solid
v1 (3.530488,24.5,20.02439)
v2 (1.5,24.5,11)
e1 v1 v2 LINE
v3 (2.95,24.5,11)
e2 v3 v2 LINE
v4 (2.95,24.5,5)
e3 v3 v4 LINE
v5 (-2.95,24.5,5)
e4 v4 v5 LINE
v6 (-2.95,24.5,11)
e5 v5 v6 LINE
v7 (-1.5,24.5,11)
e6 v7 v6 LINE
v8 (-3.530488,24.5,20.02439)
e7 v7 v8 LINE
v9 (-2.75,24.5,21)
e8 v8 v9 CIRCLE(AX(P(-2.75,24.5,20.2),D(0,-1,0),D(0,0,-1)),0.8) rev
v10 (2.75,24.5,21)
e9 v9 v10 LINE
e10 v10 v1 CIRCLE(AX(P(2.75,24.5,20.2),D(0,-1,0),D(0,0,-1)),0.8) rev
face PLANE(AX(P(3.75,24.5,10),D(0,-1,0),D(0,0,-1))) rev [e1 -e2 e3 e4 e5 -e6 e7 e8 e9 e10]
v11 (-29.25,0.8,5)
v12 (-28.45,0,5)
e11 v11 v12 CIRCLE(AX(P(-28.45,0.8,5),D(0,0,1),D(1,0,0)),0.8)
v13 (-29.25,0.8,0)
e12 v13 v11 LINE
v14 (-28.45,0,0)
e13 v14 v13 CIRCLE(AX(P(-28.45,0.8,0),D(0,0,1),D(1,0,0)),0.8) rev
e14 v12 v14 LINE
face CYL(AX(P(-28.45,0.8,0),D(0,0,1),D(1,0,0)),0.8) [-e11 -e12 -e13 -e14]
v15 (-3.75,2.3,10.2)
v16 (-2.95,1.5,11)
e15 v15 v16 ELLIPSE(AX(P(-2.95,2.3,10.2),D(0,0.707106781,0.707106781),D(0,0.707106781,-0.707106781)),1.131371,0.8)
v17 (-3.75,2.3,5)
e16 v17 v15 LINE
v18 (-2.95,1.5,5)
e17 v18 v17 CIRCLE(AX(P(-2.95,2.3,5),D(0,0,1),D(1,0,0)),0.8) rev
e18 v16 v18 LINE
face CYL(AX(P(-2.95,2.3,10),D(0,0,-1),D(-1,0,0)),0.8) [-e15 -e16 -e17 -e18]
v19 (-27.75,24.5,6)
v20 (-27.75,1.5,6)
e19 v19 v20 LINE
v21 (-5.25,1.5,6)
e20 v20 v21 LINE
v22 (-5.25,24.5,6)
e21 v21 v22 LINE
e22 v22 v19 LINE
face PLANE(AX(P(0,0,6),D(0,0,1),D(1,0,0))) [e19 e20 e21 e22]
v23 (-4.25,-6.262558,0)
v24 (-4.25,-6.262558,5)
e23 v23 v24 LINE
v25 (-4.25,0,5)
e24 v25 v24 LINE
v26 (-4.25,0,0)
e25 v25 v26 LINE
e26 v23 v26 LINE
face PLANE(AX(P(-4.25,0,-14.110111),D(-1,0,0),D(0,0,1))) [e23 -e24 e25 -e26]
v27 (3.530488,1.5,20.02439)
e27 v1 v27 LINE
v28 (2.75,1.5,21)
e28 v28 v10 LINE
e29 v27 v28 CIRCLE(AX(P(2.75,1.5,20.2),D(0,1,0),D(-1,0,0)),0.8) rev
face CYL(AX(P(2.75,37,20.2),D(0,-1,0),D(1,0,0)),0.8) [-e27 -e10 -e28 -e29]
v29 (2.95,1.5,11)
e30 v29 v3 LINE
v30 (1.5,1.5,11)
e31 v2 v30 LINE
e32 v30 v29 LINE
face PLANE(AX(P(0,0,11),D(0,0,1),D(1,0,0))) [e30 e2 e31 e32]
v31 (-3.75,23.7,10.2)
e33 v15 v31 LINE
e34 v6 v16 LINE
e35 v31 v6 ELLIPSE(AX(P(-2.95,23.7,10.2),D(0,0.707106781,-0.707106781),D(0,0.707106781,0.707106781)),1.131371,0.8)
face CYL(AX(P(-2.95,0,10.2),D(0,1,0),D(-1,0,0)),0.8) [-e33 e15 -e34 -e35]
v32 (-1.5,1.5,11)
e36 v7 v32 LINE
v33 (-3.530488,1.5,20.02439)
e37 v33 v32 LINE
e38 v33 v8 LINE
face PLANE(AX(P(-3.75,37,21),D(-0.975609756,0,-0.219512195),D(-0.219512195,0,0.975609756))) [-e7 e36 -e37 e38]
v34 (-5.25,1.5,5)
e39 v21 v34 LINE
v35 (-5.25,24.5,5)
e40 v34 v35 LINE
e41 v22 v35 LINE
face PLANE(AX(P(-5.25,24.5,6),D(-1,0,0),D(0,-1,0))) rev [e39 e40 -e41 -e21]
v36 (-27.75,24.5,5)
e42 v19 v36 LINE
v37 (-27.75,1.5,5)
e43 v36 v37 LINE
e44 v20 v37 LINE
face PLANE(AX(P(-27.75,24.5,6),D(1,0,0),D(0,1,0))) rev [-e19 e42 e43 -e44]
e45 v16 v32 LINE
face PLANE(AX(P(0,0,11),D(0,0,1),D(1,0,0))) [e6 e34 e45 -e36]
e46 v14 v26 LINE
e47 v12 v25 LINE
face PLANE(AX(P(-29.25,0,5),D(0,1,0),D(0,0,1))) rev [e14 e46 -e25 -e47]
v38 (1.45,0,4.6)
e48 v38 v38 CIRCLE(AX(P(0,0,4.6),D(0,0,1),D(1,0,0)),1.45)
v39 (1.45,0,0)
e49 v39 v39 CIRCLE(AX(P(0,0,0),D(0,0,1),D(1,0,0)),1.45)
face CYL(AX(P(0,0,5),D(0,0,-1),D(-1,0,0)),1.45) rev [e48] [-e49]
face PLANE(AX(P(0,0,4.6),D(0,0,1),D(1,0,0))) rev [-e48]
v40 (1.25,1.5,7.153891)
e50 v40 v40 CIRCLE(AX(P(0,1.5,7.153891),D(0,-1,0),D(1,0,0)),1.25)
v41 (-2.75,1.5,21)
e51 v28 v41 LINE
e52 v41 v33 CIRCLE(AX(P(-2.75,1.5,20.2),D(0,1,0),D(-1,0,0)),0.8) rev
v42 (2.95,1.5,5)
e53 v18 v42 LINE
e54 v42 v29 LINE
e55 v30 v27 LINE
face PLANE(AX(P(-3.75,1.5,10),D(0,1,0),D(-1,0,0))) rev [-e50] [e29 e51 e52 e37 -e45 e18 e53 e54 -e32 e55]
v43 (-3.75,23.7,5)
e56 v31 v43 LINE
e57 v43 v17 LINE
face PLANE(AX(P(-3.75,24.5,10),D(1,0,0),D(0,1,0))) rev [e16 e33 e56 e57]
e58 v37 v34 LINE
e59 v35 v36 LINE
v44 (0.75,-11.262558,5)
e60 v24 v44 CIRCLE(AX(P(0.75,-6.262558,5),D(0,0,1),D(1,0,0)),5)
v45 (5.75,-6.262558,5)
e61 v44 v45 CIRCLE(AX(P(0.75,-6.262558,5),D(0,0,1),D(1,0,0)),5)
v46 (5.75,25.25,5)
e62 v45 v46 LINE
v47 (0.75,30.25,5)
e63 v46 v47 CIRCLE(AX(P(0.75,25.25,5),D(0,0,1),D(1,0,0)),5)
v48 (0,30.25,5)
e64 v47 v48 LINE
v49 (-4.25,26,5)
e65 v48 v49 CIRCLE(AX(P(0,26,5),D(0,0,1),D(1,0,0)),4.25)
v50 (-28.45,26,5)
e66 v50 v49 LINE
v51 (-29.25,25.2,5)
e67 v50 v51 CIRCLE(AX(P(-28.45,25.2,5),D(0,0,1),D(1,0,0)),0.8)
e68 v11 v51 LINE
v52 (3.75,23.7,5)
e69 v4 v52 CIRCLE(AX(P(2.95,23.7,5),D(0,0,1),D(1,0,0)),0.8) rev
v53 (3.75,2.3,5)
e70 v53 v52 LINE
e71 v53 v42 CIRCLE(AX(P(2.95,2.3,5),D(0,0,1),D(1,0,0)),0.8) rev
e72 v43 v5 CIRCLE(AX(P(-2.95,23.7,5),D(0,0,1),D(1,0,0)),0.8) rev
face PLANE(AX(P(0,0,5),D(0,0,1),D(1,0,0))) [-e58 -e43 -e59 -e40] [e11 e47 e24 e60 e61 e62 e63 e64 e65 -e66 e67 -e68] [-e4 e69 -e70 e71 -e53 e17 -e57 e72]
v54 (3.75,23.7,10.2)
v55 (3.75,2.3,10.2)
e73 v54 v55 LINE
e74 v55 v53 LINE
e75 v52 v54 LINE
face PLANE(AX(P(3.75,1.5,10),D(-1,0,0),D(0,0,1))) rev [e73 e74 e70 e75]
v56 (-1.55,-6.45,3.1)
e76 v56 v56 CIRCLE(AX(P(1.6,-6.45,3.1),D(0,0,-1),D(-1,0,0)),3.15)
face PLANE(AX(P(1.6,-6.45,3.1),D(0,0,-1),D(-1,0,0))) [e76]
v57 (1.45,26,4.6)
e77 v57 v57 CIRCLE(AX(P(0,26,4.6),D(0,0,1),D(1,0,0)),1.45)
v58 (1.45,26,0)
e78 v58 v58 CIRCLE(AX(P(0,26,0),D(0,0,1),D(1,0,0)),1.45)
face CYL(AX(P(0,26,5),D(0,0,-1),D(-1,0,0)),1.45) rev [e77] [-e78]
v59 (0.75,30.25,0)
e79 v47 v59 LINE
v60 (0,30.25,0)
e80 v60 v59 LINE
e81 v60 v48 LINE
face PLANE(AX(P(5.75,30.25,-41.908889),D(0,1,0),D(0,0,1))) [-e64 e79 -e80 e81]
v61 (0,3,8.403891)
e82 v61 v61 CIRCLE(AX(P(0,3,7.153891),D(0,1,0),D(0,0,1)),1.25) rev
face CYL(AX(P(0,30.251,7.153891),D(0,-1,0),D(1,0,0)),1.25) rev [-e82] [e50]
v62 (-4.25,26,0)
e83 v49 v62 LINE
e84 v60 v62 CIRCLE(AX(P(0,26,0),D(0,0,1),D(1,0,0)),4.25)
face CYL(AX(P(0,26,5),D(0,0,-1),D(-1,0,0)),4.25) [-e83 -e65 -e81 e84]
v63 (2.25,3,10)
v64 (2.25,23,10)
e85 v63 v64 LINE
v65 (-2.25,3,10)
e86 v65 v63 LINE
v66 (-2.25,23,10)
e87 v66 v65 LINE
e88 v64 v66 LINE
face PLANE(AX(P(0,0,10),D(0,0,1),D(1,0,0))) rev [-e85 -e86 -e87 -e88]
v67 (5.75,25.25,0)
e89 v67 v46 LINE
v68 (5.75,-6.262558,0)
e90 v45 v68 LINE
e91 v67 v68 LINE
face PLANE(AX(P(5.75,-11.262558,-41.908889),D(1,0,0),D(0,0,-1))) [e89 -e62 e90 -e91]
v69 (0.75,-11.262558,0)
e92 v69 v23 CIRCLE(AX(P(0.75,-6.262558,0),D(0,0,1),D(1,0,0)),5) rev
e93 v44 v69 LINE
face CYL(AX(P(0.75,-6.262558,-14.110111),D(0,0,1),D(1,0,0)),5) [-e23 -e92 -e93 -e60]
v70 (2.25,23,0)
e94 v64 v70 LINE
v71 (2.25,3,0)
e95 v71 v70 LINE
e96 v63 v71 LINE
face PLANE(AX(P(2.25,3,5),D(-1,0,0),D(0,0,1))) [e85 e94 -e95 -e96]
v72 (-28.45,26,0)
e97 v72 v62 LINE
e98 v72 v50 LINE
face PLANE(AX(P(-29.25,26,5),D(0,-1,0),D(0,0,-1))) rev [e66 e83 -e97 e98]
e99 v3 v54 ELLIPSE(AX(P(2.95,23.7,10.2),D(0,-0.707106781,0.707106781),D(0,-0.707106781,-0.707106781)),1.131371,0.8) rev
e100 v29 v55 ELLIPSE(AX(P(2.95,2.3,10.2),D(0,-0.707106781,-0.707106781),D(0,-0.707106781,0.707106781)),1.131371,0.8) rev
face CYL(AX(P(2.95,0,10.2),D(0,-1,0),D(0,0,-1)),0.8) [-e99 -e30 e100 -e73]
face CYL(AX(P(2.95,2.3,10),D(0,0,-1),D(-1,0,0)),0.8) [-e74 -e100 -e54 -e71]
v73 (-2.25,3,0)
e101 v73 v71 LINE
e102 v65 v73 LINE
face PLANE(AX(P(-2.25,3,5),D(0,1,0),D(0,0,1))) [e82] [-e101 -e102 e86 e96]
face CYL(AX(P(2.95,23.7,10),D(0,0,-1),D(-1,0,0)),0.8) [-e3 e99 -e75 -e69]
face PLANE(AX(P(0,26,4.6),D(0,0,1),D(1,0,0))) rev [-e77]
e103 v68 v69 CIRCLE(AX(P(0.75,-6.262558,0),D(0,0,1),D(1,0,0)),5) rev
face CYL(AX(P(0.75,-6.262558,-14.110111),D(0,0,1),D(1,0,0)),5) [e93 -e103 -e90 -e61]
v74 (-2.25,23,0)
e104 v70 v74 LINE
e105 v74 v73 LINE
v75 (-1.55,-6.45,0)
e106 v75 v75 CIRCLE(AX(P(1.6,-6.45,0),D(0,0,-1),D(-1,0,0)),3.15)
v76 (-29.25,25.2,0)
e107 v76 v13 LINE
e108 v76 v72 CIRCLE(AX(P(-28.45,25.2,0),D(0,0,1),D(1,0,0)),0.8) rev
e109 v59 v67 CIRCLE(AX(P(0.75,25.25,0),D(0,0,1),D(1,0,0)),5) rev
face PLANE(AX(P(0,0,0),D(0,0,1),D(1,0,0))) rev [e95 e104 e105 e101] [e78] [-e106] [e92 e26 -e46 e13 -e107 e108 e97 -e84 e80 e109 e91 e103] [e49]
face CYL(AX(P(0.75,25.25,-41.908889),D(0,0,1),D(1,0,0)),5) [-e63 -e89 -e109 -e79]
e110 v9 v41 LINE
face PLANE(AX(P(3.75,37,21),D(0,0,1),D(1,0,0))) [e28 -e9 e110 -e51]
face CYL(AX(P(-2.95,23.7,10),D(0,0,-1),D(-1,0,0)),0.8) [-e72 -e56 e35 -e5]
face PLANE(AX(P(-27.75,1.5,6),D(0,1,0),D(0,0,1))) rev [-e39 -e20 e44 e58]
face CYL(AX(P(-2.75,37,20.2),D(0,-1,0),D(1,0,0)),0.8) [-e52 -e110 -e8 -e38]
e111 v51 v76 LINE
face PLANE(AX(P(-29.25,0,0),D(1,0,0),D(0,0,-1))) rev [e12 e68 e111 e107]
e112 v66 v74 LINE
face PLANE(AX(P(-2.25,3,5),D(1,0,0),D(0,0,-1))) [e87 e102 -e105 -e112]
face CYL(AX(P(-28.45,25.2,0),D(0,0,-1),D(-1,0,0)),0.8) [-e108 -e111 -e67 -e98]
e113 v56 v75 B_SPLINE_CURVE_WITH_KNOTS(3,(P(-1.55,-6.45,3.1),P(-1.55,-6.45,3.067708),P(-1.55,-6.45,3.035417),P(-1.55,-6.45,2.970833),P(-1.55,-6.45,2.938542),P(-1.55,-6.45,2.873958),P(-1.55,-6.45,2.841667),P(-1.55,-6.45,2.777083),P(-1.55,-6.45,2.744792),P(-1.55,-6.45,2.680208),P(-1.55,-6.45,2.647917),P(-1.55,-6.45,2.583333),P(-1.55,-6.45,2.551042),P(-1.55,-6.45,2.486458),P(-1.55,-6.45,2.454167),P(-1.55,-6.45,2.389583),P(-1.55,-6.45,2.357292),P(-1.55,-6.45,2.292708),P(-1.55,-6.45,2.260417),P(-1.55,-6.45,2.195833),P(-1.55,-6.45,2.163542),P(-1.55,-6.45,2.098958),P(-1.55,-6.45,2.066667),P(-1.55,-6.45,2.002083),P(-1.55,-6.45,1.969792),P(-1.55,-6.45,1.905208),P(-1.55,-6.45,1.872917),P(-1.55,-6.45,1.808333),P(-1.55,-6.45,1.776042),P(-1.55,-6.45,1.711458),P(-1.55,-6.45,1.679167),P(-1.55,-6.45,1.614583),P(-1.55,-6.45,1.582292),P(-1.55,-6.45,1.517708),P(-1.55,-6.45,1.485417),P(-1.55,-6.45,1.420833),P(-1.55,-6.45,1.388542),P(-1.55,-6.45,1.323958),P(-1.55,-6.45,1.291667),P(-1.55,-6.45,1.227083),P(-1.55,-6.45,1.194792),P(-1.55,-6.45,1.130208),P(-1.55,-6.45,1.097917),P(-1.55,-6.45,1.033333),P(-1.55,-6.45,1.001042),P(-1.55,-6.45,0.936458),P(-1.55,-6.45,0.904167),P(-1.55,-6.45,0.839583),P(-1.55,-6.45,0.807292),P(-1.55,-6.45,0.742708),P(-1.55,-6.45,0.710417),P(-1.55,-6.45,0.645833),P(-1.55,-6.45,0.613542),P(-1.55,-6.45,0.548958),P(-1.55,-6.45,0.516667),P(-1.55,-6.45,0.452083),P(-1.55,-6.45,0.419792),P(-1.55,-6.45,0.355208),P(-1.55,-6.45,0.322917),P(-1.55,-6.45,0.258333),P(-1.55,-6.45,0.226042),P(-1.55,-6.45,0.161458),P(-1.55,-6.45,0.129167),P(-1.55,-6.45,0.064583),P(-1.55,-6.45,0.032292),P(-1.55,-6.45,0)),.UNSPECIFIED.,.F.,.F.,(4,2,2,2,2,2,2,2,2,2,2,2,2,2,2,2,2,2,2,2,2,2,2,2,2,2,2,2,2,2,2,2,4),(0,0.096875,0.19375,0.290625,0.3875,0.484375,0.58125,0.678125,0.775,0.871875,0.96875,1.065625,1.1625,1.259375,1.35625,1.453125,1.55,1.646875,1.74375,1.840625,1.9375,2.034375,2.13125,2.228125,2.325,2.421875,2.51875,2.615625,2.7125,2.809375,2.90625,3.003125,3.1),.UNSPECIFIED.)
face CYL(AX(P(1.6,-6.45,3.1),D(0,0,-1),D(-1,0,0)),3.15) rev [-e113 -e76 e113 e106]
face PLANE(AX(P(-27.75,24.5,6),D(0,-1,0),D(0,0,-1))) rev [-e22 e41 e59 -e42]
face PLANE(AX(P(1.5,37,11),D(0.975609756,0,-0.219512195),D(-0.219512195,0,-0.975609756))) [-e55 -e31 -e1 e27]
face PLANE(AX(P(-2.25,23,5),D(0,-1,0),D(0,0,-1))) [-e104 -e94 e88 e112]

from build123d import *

# Parameters (mm, degrees)
SKETCH1_R           = 1.45
SKETCH1_W           = 4.5
SKETCH1_H           = 20
BOSS_EXTRUDE1_DEPTH = 5
SKETCH2_W           = 7.5
SKETCH2_H           = 23
SKETCH2_W_2         = 4.5
SKETCH2_H_2         = 20
BOSS_EXTRUDE2_DEPTH = 5
SKETCH3_W           = 7.5
SKETCH3_H           = 23
BOSS_EXTRUDE3_DEPTH = 1
CUT_EXTRUDE1_REACH  = 33.075
SKETCH6_R           = 1.25
SKETCH7_W           = 5
SKETCH7_H           = 26
BOSS_EXTRUDE4_DEPTH = 25
SKETCH8_W           = 22.5
SKETCH8_H           = 23
BOSS_EXTRUDE5_DEPTH = 1
BOSS_EXTRUDE6_DEPTH = 23
FILLET1_R           = 0.8
BOSS_EXTRUDE7_START = -5
BOSS_EXTRUDE7_DEPTH = 5
BOSS_EXTRUDE8_START = -5
BOSS_EXTRUDE8_DEPTH = 5
SKETCH12_R          = 3.15
CUT_EXTRUDE2_DEPTH  = 3.1
FILLET2_R           = 5
BOSS_EXTRUDE9_START = -0.4
SKETCH14_R          = 1.45
BOSS_EXTRUDE9_DEPTH = 0.4


with BuildPart() as part:
    # Sketch1 → Boss-Extrude1 (new body)
    with BuildSketch(Plane.XY):
        with BuildLine():
            Line((-4.25, 0), (-4.25, 26))
            ThreePointArc((-4.25, 26), (0, 30.25), (4.25, 26))
            Line((4.25, 26), (4.25, 0))
            ThreePointArc((4.25, 0), (0, -4.25), (-4.25, 0))
        make_face()
        with Locations((0, 26)):
            Circle(SKETCH1_R, mode=Mode.SUBTRACT)
        Circle(SKETCH1_R, mode=Mode.SUBTRACT)
        with Locations((0, 13)):
            Rectangle(SKETCH1_W, SKETCH1_H, mode=Mode.SUBTRACT)
    extrude(amount=BOSS_EXTRUDE1_DEPTH)

    # Sketch2 → Boss-Extrude2 (add)
    with BuildSketch(Plane.XY.offset(5)):
        with Locations((0, 13)):
            Rectangle(SKETCH2_W, SKETCH2_H)
        with Locations((0, 13)):
            Rectangle(SKETCH2_W_2, SKETCH2_H_2, mode=Mode.SUBTRACT)
    extrude(amount=BOSS_EXTRUDE2_DEPTH)

    # Sketch3 → Boss-Extrude3 (add)
    with BuildSketch(Plane.XY.offset(10)):
        with Locations((0, 13)):
            Rectangle(SKETCH3_W, SKETCH3_H)
    extrude(amount=BOSS_EXTRUDE3_DEPTH)

    # Sketch6 → Cut-Extrude1 (cut, up to next)
    with BuildSketch(Plane.XZ.offset(-1.5), mode=Mode.PRIVATE) as cut_extrude1_sk1:
        with Locations((0, 7.153891294)):
            Circle(SKETCH6_R)
    cut_extrude1_tool1 = extrude(cut_extrude1_sk1.sketch, amount=-CUT_EXTRUDE1_REACH, mode=Mode.PRIVATE) & part.part
    add(cut_extrude1_tool1.solids().sort_by_distance((0, 1.5, 7.153891))[0], mode=Mode.SUBTRACT)

    # Sketch7 → Boss-Extrude4 (add)
    with BuildSketch(Plane.ZY.offset(4.25)):
        with Locations((2.5, 13)):
            Rectangle(SKETCH7_W, SKETCH7_H)
    extrude(amount=BOSS_EXTRUDE4_DEPTH)

    # Sketch8 → Boss-Extrude5 (add)
    with BuildSketch(Plane.XY.offset(5)):
        with Locations((-16.5, 13)):
            Rectangle(SKETCH8_W, SKETCH8_H)
    extrude(amount=BOSS_EXTRUDE5_DEPTH)

    # Sketch10 → Boss-Extrude6 (add)
    with BuildSketch(Plane.XZ.offset(-1.5)):
        Polygon((-1.5, 11), (1.5, 11), (3.75, 21), (-3.75, 21), align=None)
    extrude(amount=-BOSS_EXTRUDE6_DEPTH)

    # Fillet1
    fillet1_edges = [part.edges().sort_by_distance(p)[0] for p in [
        (-3.75, 13, 21),
        (3.75, 13, 21),
        (-3.75, 1.5, 8),
        (3.75, 1.5, 8),
        (3.75, 24.5, 8),
        (-3.75, 24.5, 8),
        (-3.75, 13, 11),
        (3.75, 13, 11),
        (-29.25, 26, 2.5),
        (-29.25, 0, 2.5),
    ]]
    fillet(fillet1_edges, radius=FILLET1_R)

    # Sketch11 → Boss-Extrude7 (add)
    with BuildSketch(Plane.XY.offset(5).offset(BOSS_EXTRUDE7_START)):
        with BuildLine():
            Line((-4.25, 0), (-4.25, -11.262558254))
            Line((-4.25, -11.262558254), (4.25, -11.262558254))
            Line((4.25, -11.262558254), (4.25, 0))
            ThreePointArc((4.25, 0), (0, -4.25), (-4.25, 0))
        make_face()
    extrude(amount=BOSS_EXTRUDE7_DEPTH)

    # Sketch13 → Boss-Extrude8 (add)
    with BuildSketch(Plane.XY.offset(5).offset(BOSS_EXTRUDE8_START)):
        with BuildLine():
            Line((4.25, -11.262558254), (5.75, -11.262558254))
            Line((5.75, -11.262558254), (5.75, 30.25))
            Line((5.75, 30.25), (0, 30.25))
            ThreePointArc((0, 30.25), (3.00520382, 29.00520382), (4.25, 26))
            Line((4.25, 26), (4.25, -11.262558254))
        make_face()
    extrude(amount=BOSS_EXTRUDE8_DEPTH)

    # Sketch12 → Cut-Extrude2 (cut)
    with BuildSketch(Plane(origin=(0, 0, 0), x_dir=(-1, 0, 0), z_dir=(0, 0, -1))):
        with Locations((-1.6, -6.45)):
            Circle(SKETCH12_R)
    extrude(amount=-CUT_EXTRUDE2_DEPTH, mode=Mode.SUBTRACT)

    # Fillet2
    fillet2_edges = [part.edges().sort_by_distance(p)[0] for p in [
        (5.75, 30.25, 2.5),
        (5.75, -11.262558254, 2.5),
        (-4.25, -11.262558254, 2.5),
    ]]
    fillet(fillet2_edges, radius=FILLET2_R - 0.0001)  # a hair under: the kernel refuses the full size

    # Sketch14 → Boss-Extrude9 (add)
    with BuildSketch(Plane.XY.offset(5).offset(BOSS_EXTRUDE9_START)):
        with Locations((0, 26)):
            Circle(SKETCH14_R)
        Circle(SKETCH14_R)
    extrude(amount=BOSS_EXTRUDE9_DEPTH)


solid = part.part
